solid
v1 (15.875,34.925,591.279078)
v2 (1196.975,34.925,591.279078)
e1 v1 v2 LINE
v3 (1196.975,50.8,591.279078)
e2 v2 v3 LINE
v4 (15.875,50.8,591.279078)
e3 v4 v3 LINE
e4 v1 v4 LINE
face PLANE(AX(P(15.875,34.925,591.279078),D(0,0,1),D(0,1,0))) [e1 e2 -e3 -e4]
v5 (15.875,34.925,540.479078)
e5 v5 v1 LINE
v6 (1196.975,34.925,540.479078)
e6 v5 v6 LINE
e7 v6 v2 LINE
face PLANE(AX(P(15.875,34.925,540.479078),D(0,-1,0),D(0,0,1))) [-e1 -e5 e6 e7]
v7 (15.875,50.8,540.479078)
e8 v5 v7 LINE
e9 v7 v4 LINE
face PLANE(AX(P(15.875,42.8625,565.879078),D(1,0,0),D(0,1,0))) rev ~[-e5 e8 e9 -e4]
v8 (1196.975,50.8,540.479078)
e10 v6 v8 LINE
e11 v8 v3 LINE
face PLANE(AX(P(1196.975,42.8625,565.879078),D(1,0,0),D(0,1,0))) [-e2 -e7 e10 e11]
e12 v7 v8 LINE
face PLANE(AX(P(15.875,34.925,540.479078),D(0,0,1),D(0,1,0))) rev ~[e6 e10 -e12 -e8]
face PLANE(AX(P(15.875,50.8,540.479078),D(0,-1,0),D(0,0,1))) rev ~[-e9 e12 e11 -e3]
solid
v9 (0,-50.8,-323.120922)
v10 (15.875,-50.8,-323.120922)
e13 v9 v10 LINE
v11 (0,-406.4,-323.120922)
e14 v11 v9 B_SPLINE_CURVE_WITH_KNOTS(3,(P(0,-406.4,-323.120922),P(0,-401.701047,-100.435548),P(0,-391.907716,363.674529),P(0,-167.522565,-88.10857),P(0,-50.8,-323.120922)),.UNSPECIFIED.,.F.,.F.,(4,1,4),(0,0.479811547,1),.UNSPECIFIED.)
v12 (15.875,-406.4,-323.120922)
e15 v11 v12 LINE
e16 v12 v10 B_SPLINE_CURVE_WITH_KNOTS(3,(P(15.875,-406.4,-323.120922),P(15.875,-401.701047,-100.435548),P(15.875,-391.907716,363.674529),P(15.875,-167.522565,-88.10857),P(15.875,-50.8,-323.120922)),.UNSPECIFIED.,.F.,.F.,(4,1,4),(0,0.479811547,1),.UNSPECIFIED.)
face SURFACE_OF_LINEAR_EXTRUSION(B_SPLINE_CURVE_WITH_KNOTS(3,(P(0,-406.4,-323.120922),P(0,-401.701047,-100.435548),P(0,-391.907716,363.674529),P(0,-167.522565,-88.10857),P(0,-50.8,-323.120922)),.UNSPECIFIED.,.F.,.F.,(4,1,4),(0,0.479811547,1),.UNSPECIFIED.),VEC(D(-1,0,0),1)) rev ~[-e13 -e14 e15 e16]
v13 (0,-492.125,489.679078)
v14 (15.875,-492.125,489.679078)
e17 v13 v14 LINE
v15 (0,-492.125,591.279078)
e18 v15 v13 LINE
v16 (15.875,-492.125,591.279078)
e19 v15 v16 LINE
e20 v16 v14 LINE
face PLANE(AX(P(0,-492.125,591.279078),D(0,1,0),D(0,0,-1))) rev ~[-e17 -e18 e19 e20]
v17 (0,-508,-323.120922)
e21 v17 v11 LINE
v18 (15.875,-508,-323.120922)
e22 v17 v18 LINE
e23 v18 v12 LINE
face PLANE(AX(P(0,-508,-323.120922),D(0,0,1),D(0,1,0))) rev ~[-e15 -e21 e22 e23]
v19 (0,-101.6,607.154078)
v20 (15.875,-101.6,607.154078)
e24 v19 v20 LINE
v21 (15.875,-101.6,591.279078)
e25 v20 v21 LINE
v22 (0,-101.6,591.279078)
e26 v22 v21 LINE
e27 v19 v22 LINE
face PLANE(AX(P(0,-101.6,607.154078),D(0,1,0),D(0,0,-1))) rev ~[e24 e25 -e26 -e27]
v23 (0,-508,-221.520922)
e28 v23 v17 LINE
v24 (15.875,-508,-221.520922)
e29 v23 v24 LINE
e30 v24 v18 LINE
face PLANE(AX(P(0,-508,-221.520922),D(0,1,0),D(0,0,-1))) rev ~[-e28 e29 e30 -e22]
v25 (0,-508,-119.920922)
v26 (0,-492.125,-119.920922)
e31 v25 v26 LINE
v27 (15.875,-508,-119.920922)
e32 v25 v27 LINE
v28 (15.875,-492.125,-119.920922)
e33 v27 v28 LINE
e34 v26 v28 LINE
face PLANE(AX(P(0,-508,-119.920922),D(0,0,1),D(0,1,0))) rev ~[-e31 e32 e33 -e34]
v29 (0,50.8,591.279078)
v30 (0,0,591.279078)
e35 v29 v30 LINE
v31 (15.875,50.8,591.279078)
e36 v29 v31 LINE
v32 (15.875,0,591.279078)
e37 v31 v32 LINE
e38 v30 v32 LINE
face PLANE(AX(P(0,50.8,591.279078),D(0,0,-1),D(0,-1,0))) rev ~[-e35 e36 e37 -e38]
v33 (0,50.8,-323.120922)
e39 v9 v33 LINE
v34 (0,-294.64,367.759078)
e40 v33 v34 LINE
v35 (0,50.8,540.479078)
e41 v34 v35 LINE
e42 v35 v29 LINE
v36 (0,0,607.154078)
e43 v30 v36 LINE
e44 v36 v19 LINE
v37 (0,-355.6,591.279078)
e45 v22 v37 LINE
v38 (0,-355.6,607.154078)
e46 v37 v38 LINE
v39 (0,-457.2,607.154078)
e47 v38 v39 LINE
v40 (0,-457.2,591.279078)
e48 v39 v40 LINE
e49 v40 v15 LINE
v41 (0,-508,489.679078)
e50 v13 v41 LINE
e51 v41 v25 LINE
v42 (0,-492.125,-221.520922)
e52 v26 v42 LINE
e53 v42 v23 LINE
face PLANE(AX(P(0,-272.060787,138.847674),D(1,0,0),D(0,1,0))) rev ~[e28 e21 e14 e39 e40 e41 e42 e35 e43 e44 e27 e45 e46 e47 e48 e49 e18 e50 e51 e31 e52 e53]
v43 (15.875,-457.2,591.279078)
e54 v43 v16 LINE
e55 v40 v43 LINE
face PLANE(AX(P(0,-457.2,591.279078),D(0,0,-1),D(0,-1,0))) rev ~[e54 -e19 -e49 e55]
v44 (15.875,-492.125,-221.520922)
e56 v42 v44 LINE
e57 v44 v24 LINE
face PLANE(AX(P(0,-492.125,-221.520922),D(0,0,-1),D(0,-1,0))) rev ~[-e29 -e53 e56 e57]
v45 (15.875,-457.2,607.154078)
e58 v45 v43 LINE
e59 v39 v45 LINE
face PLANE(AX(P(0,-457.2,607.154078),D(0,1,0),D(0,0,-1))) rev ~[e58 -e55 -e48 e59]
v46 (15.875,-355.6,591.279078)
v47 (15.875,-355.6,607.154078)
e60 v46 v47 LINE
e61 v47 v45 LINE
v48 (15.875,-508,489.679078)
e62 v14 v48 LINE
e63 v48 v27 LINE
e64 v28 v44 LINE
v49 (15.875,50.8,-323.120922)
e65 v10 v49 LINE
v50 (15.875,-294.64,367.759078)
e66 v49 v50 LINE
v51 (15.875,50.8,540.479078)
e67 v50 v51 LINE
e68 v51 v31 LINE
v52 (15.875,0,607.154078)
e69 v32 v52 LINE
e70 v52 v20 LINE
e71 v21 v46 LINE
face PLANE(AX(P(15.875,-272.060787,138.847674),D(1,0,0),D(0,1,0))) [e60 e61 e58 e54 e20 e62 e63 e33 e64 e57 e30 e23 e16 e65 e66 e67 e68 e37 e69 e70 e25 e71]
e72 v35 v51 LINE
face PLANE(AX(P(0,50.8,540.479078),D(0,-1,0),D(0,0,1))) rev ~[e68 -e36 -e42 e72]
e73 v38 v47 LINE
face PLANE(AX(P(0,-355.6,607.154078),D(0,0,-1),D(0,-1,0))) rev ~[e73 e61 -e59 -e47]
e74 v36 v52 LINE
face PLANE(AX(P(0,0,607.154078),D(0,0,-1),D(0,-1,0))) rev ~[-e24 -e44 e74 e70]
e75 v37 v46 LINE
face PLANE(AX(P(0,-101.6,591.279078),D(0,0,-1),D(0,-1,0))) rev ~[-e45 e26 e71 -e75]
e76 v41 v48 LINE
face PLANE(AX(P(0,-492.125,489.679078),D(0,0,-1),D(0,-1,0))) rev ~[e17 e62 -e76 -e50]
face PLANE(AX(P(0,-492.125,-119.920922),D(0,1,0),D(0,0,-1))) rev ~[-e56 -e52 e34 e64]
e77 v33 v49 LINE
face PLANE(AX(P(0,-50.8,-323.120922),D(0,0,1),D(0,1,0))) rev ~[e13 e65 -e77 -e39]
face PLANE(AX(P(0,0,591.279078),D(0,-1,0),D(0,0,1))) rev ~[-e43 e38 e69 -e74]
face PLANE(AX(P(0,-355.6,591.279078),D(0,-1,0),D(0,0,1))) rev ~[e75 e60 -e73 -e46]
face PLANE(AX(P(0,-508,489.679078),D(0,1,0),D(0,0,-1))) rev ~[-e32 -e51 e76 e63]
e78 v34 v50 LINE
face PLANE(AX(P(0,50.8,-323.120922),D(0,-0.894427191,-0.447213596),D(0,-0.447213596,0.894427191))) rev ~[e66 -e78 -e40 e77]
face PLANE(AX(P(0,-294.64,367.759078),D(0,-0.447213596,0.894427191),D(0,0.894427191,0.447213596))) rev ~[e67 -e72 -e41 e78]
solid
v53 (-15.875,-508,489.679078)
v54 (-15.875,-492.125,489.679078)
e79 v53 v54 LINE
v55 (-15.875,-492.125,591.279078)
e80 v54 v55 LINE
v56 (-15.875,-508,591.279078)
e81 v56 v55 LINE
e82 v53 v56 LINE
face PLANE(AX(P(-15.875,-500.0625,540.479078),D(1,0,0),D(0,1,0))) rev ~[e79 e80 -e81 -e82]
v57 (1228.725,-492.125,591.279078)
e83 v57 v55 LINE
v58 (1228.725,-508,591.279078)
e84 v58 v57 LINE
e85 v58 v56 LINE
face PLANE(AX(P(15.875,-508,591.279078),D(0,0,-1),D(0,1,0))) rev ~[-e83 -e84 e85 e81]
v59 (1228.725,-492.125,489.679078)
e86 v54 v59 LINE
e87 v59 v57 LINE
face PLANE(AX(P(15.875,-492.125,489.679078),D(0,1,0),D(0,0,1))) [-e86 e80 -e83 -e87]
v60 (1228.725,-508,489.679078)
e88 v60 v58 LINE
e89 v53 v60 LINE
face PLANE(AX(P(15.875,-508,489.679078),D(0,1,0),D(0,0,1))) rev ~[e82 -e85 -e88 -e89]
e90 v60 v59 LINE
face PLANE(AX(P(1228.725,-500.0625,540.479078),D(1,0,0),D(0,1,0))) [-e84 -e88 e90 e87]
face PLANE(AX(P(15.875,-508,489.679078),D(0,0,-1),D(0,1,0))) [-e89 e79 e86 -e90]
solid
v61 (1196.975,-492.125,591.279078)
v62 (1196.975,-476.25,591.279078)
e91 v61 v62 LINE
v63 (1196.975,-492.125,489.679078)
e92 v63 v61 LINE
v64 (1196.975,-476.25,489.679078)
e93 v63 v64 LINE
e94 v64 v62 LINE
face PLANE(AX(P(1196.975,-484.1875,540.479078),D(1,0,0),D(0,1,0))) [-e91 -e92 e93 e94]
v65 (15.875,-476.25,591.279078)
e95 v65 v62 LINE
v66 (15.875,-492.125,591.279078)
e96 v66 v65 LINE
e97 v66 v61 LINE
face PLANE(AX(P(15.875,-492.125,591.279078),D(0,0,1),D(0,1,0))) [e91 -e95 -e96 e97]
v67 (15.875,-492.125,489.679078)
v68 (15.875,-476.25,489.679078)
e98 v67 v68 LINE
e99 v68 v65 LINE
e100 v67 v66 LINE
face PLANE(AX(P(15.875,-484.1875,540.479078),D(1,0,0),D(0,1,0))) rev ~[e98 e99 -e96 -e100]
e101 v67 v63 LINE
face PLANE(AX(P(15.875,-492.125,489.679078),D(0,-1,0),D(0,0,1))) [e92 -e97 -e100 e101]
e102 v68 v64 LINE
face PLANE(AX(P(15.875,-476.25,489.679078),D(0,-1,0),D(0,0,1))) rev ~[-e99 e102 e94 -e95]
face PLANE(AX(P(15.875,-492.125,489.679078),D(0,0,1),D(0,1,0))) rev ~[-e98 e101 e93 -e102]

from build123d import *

# Parameters (mm, degrees)
F1_DEPTH      = 15.875
F2_W          = 15.875
F2_H          = 50.8
F3_DEPTH      = 1181.1
F4_W          = 15.875
F4_H          = 101.6
F5_DEPTH      = 1181.1
F6_W          = 15.875
F6_H          = 101.6
F7_DEPTH      = 1212.85
F7_DEPTH_BACK = 31.75


with BuildPart() as f1:
    # F0 (on Right) → F1 (new body)
    with BuildSketch(Plane.YZ):
        with BuildLine():
            Line((-492.125, 489.6790781498), (-508, 489.6790781498))
            Line((-508, 489.6790781498), (-508, -119.9209218502))
            Line((-508, -119.9209218502), (-492.125, -119.9209218502))
            Line((-492.125, -119.9209218502), (-492.125, -221.5209218502))
            Line((-492.125, -221.5209218502), (-508, -221.5209218502))
            Line((-508, -221.5209218502), (-508, -323.1209218502))
            Line((-508, -323.1209218502), (-406.4, -323.1209218502))
            add(Edge.make_bspline(
                [(-406.4, -323.1209218502), (-401.7010466691, -100.4355481062), (-391.907715593, 363.674528608), (-167.5225646264, -88.1085703651), (-50.8, -323.1209218502)],
                knots=[0, 0, 0, 0, 0.4798115467, 1, 1, 1, 1], degree=3))
            Line((-50.8, -323.1209218502), (50.8, -323.1209218502))
            Line((50.8, -323.1209218502), (-294.64, 367.7590781498))
            Line((-294.64, 367.7590781498), (50.8, 540.4790781498))
            Line((50.8, 540.4790781498), (50.8, 591.2790781498))
            Line((50.8, 591.2790781498), (0, 591.2790781498))
            Line((0, 591.2790781498), (0, 607.1540781498))
            Line((0, 607.1540781498), (-101.6, 607.1540781498))
            Line((-101.6, 607.1540781498), (-101.6, 591.2790781498))
            Line((-101.6, 591.2790781498), (-355.6, 591.2790781498))
            Line((-355.6, 591.2790781498), (-355.6, 607.1540781498))
            Line((-355.6, 607.1540781498), (-457.2, 607.1540781498))
            Line((-457.2, 607.1540781498), (-457.2, 591.2790781498))
            Line((-457.2, 591.2790781498), (-492.125, 591.2790781498))
            Line((-492.125, 591.2790781498), (-492.125, 489.6790781498))
        make_face()
    extrude(amount=F1_DEPTH)


with BuildPart() as f3:
    # F2 (on face) → F3 (new body)
    with BuildSketch(Plane.YZ.offset(15.875)):
        with Locations((42.8625, 565.8790781498)):
            Rectangle(F2_W, F2_H)
    extrude(amount=F3_DEPTH)


with BuildPart() as f5:
    # F4 (on face) → F5 (new body)
    with BuildSketch(Plane.YZ.offset(15.875)):
        with Locations((-484.1875, 540.4790781498)):
            Rectangle(F4_W, F4_H)
    extrude(amount=F5_DEPTH)


with BuildPart() as f7:
    # F6 (on face) → F7 (new body, two sides)
    with BuildSketch(Plane.YZ.offset(15.875)) as f7_sk:
        with Locations((-500.0625, 540.4790781498)):
            Rectangle(F6_W, F6_H)
    extrude(amount=F7_DEPTH)
    extrude(f7_sk.sketch, amount=-F7_DEPTH_BACK)


solid = Compound([f1.part, f3.part, f5.part, f7.part])
